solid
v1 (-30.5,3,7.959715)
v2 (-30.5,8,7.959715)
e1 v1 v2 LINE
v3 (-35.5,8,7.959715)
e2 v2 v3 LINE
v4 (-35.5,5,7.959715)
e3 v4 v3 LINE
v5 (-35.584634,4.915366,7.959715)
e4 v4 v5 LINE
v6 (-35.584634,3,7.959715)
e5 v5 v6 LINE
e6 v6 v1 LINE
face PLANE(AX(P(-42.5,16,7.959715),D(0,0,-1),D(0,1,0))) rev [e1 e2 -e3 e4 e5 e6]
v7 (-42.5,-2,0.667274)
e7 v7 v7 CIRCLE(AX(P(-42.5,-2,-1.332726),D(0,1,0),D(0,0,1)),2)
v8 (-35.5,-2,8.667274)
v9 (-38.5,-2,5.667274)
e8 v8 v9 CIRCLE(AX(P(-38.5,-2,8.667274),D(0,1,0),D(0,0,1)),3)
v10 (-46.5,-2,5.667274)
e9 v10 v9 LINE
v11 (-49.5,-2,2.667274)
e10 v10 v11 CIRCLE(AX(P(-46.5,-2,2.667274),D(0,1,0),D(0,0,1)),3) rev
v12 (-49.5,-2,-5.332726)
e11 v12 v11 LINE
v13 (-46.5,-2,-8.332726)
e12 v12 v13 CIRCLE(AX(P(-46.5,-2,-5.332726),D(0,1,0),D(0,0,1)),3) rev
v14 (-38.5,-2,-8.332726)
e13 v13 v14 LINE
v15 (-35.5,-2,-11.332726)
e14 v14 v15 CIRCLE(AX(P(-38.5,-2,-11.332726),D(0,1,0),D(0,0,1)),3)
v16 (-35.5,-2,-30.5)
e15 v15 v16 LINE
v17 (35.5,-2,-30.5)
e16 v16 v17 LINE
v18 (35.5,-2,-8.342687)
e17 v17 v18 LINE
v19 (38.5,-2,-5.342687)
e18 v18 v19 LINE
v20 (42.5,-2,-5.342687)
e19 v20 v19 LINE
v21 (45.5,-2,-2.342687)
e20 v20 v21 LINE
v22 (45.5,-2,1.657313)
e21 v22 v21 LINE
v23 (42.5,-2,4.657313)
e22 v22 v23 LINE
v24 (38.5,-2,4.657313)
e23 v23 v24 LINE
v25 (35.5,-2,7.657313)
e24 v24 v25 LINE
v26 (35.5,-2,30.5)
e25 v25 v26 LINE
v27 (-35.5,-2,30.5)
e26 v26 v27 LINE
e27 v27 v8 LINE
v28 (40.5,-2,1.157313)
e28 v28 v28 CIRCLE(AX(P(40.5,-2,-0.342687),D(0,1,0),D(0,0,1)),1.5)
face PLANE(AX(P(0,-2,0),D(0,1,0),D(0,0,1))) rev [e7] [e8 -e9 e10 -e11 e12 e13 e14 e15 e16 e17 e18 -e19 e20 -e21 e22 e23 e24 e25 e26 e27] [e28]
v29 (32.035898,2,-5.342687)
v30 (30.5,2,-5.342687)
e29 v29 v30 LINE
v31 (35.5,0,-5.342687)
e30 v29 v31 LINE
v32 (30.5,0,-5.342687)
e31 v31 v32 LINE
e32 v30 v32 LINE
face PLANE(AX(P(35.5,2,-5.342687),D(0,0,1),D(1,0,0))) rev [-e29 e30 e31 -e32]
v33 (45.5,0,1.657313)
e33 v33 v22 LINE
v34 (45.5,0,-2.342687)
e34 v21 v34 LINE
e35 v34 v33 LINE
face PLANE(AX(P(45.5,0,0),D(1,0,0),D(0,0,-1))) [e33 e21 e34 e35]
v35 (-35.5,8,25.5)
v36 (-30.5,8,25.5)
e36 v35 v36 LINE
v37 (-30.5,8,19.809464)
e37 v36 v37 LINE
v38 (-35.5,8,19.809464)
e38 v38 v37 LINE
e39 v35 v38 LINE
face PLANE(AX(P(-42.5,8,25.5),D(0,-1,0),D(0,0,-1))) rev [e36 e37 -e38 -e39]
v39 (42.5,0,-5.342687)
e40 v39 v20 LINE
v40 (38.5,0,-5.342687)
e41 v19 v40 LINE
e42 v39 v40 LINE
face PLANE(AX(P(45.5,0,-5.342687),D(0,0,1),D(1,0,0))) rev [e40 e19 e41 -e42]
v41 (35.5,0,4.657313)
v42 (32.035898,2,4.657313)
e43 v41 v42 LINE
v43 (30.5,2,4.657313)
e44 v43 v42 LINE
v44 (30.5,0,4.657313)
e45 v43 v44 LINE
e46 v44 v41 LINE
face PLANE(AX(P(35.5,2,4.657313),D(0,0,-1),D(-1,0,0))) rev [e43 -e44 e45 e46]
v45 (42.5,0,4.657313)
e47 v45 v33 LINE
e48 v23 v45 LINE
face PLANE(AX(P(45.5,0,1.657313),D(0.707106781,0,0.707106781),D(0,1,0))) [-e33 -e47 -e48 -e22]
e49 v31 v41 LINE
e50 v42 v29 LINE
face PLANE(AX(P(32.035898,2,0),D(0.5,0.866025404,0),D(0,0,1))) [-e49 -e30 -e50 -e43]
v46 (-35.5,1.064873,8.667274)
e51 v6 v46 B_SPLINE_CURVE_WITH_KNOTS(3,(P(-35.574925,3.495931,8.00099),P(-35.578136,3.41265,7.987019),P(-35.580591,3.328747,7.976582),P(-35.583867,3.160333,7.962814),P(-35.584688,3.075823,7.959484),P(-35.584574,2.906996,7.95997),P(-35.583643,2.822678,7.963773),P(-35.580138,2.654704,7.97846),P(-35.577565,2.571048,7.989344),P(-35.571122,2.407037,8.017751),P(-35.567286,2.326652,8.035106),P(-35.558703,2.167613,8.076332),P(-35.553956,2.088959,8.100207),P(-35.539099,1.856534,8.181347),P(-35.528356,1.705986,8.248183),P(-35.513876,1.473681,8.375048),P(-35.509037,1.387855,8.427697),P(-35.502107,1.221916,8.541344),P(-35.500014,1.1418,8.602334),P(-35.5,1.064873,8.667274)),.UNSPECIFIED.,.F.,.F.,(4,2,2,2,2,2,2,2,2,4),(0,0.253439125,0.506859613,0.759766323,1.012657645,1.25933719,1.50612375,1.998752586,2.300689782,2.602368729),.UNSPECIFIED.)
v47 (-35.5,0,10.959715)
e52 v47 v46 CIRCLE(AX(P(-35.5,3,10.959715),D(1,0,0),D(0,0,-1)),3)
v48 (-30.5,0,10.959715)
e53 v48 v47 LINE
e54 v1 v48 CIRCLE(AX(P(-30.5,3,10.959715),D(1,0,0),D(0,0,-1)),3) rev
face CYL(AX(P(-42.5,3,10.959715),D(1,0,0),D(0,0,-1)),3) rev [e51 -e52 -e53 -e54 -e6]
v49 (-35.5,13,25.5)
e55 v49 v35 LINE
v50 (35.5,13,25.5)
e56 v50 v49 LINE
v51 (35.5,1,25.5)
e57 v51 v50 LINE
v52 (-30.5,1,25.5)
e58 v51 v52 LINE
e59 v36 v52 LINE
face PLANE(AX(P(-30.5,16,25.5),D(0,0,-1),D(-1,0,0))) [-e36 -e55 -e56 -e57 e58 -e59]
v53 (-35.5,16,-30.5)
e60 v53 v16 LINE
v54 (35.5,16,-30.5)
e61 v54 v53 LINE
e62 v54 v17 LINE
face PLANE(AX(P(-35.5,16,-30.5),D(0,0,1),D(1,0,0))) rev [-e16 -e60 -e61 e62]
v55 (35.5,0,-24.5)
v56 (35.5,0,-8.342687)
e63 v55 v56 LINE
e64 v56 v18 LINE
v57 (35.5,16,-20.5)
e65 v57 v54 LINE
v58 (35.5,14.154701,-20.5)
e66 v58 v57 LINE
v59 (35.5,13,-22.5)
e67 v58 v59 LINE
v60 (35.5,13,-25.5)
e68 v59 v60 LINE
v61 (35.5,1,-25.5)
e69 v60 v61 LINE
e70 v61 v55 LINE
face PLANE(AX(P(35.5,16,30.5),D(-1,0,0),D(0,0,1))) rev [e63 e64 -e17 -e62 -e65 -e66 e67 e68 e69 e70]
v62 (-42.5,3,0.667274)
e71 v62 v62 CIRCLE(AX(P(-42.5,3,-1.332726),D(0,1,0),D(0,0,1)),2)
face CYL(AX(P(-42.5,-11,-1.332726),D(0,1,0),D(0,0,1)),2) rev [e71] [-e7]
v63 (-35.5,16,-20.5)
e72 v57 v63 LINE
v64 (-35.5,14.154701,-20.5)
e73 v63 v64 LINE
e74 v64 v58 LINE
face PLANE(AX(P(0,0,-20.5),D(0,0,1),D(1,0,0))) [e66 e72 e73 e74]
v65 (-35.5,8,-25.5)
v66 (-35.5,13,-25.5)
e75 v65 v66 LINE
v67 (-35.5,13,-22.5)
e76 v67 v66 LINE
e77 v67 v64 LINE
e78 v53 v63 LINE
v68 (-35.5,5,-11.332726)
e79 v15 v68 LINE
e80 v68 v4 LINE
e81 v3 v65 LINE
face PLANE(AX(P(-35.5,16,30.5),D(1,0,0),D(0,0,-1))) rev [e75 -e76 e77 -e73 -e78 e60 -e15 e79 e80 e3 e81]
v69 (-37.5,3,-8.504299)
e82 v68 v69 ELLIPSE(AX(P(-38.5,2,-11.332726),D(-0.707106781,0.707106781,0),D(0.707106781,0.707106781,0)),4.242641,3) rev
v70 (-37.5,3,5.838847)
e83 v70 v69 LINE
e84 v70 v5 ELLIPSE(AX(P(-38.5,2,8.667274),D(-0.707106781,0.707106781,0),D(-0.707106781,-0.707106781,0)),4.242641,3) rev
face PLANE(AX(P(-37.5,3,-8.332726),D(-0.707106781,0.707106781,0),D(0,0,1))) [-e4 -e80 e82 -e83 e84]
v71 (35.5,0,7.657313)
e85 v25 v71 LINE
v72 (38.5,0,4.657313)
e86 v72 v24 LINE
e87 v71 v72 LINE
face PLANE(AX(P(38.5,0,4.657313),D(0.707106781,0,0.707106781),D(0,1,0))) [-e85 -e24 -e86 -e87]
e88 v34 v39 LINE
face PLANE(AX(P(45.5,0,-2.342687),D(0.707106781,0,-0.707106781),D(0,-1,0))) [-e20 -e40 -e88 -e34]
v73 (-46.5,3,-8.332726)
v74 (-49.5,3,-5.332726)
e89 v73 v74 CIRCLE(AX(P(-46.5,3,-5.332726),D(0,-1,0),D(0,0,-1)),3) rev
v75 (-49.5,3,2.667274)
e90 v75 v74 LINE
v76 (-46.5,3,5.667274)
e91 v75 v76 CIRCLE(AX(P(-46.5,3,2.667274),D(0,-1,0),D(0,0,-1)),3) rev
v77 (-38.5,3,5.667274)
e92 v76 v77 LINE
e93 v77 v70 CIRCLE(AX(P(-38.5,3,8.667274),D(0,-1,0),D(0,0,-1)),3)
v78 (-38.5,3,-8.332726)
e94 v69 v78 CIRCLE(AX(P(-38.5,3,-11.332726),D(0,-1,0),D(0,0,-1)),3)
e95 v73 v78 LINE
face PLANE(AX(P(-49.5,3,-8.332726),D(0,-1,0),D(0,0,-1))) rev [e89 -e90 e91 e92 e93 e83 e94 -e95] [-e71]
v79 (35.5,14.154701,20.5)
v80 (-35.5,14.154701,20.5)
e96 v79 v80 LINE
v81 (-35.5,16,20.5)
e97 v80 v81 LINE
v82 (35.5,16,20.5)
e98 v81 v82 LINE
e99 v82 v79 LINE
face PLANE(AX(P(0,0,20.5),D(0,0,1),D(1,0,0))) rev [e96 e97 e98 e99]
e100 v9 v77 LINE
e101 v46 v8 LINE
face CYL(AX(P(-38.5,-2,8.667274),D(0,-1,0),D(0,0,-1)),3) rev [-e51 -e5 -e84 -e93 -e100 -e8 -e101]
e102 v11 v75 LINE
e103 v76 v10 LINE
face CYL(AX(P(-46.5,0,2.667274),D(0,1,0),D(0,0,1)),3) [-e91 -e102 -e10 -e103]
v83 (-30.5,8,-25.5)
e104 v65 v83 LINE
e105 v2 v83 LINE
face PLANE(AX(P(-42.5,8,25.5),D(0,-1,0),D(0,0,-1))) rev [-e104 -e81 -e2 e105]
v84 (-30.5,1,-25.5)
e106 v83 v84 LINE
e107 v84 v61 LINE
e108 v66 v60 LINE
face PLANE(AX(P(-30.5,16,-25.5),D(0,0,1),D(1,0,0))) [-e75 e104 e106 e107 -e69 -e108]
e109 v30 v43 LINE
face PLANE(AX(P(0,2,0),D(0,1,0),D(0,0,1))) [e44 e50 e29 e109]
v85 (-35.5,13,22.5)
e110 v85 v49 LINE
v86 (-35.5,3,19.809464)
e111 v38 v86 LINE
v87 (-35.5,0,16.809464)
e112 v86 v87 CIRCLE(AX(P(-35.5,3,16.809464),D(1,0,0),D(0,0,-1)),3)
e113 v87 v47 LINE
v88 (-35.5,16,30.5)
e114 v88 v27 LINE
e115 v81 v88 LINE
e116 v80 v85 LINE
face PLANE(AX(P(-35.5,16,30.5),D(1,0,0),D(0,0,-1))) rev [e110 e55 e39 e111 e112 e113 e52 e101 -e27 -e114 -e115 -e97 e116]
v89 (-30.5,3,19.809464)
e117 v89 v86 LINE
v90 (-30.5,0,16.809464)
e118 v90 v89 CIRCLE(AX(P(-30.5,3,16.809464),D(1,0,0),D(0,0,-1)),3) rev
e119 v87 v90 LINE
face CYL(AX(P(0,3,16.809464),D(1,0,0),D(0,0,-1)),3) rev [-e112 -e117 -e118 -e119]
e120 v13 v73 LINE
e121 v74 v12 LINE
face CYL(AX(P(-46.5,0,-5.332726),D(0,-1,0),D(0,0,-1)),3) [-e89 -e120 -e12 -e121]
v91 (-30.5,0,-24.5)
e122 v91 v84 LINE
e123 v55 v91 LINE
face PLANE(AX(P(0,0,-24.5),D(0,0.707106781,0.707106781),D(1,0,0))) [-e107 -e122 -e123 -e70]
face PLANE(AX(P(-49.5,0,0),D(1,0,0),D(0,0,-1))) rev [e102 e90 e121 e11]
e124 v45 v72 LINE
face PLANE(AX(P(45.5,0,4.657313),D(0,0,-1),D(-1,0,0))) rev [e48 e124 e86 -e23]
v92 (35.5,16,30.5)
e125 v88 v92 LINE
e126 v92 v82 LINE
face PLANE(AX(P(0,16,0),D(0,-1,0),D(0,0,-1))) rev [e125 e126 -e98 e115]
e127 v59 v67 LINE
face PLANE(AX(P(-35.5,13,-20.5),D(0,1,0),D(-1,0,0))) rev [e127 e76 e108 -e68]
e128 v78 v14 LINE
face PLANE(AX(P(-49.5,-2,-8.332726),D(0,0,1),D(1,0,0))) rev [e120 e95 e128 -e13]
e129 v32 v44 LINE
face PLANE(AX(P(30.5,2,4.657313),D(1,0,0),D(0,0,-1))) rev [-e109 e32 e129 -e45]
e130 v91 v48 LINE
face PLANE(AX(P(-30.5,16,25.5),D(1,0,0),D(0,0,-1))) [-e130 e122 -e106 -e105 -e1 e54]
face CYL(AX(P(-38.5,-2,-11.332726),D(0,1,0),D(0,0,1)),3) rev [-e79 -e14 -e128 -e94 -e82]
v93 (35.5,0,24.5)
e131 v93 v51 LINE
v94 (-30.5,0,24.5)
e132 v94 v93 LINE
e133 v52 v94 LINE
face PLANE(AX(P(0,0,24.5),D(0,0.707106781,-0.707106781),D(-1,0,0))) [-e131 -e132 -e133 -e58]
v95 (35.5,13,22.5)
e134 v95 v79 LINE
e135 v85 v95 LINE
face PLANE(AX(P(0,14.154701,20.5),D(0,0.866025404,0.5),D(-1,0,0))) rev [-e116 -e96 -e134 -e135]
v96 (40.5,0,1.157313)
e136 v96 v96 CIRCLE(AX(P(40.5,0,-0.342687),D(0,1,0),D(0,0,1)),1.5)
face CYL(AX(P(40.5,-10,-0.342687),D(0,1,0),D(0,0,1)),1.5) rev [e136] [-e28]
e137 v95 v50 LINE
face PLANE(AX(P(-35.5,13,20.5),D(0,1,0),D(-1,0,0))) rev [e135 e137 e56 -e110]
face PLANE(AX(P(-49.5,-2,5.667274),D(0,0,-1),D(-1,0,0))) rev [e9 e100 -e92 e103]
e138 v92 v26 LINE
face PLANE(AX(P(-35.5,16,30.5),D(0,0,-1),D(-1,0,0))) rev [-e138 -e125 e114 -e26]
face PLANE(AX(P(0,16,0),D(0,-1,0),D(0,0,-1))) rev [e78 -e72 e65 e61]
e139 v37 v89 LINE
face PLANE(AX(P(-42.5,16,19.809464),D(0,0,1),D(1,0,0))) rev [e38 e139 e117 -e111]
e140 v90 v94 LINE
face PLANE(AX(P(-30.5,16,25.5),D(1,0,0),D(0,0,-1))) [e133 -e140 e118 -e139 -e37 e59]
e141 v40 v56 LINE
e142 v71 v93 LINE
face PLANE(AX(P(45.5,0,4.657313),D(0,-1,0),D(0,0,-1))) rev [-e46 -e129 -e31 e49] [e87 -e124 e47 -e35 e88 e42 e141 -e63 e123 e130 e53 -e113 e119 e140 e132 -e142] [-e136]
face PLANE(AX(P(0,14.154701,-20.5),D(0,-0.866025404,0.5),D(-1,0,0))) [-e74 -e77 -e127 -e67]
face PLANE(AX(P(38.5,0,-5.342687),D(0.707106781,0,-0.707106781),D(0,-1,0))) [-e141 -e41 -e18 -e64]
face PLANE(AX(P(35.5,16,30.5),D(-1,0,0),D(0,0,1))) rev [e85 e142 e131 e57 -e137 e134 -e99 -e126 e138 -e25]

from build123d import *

# Parameters (mm, degrees)
SKETCH1_W           = 71
SKETCH1_H           = 61
SKETCH1_W_2         = 61
SKETCH1_H_2         = 51
BOSS_EXTRUDE1_DEPTH = 16
SKETCH2_W           = 71
SKETCH2_H           = 61
BOSS_EXTRUDE2_DEPTH = 2
SKETCH3_W           = 11.849749017
SKETCH3_H           = 16
CUT_EXTRUDE1_DEPTH  = 12
FILLET1_R           = 3
SKETCH4_W           = 15
SKETCH4_H           = 16
CUT_EXTRUDE2_DEPTH  = 12
SKETCH5_W           = 21
SKETCH5_H           = 8
CUT_EXTRUDE3_DEPTH  = 12
SKETCH6_W           = 51
SKETCH6_H           = 8
CUT_EXTRUDE4_DEPTH  = 12
CHAMFER1_SIZE       = 1
SKETCH8_W           = 21
SKETCH8_H           = 8
CUT_EXTRUDE5_DEPTH  = 14
SKETCH9_W           = 71
SKETCH9_H           = 3
BOSS_EXTRUDE4_DEPTH = 5
CHAMFER3_SIZE       = 2
CHAMFER3_SIZE2      = 1.154700538
SKETCH10_W          = 71
SKETCH10_H          = 3
BOSS_EXTRUDE5_DEPTH = 5
CHAMFER4_SIZE       = 2
CHAMFER4_SIZE2      = 1.154700538
SKETCH11_W          = 5
SKETCH11_H          = 10
BOSS_EXTRUDE6_DEPTH = 2
CHAMFER5_SIZE       = 2
CHAMFER5_SIZE2      = 3.464101615
SKETCH12_W          = 14
SKETCH12_H          = 5
BOSS_EXTRUDE7_DEPTH = 14
CHAMFER6_SIZE       = 2
SKETCH13_R          = 2
CUT_EXTRUDE6_DEPTH  = 14
FILLET2_R           = 3
SKETCH14_W          = 10
SKETCH14_H          = 2
BOSS_EXTRUDE8_DEPTH = 10
SKETCH15_R          = 1.5
CUT_EXTRUDE7_DEPTH  = 10
CHAMFER7_SIZE       = 3
CHAMFER8_SIZE       = 3
FILLET3_R           = 3


with BuildPart() as part:
    # Sketch1 → Boss-Extrude1 (new body)
    with BuildSketch(Plane(origin=(0, 0, 0), x_dir=(1, 0, 0), z_dir=(0, 1, 0))):
        Rectangle(SKETCH1_W, SKETCH1_H)
        Rectangle(SKETCH1_W_2, SKETCH1_H_2, mode=Mode.SUBTRACT)
    extrude(amount=BOSS_EXTRUDE1_DEPTH)

    # Sketch2 → Boss-Extrude2 (add)
    with BuildSketch(Plane.XZ):
        Rectangle(SKETCH2_W, SKETCH2_H)
    extrude(amount=BOSS_EXTRUDE2_DEPTH)

    # Sketch3 → Cut-Extrude1 (cut)
    with BuildSketch(Plane(origin=(-30.5, 0, 0), x_dir=(0, 0, -1), z_dir=(1, 0, 0))):
        with Locations((-13.884589143, 8)):
            Rectangle(SKETCH3_W, SKETCH3_H)
    extrude(amount=-CUT_EXTRUDE1_DEPTH, mode=Mode.SUBTRACT)

    # Fillet1
    fillet1_edges = [part.edges().sort_by_distance(p)[0] for p in [
        (-33, 0, 19.809463651),
        (-33, 0, 7.959714634),
    ]]
    fillet(fillet1_edges, radius=FILLET1_R)

    # Sketch4 → Cut-Extrude2 (cut)
    with BuildSketch(Plane.ZY.offset(-30.5)):
        with Locations((-18, 8)):
            Rectangle(SKETCH4_W, SKETCH4_H)
        with Locations((18, 8)):
            Rectangle(SKETCH4_W, SKETCH4_H)
    extrude(amount=-CUT_EXTRUDE2_DEPTH, mode=Mode.SUBTRACT)

    # Sketch5 → Cut-Extrude3 (cut)
    with BuildSketch(Plane.ZY.offset(-30.5)):
        with Locations((0, 12)):
            Rectangle(SKETCH5_W, SKETCH5_H)
    extrude(amount=-CUT_EXTRUDE3_DEPTH, mode=Mode.SUBTRACT)

    # Sketch6 → Cut-Extrude4 (cut)
    with BuildSketch(Plane(origin=(-30.5, 0, 0), x_dir=(0, 0, -1), z_dir=(1, 0, 0))):
        with Locations((0, 12)):
            Rectangle(SKETCH6_W, SKETCH6_H)
    extrude(amount=-CUT_EXTRUDE4_DEPTH, mode=Mode.SUBTRACT)

    # Chamfer1
    chamfer1_edges = [part.edges().sort_by_distance(p)[0] for p in [
        (2.5, 0, -25.5),
        (2.5, 0, 25.5),
    ]]
    chamfer(chamfer1_edges, length=CHAMFER1_SIZE)

    # Sketch8 → Cut-Extrude5 (cut)
    with BuildSketch(Plane.ZY.offset(-30.5)):
        with Locations((0, 4)):
            Rectangle(SKETCH8_W, SKETCH8_H)
    extrude(amount=-CUT_EXTRUDE5_DEPTH, mode=Mode.SUBTRACT)

    # Sketch9 → Boss-Extrude4 (add)
    with BuildSketch(Plane.XY.offset(-25.5)):
        with Locations((0, 14.5)):
            Rectangle(SKETCH9_W, SKETCH9_H)
    extrude(amount=BOSS_EXTRUDE4_DEPTH)

    # Chamfer3
    chamfer3_edges = [part.edges().sort_by_distance(p)[0] for p in [
        (0, 13, -20.5),
    ]]
    chamfer3_side = [part.faces().sort_by_distance(p)[0] for p in [
        (0, 13, -23),
    ]]
    chamfer(chamfer3_edges, length=CHAMFER3_SIZE, length2=CHAMFER3_SIZE2, reference=chamfer3_side[0])

    # Sketch10 → Boss-Extrude5 (add)
    with BuildSketch(Plane(origin=(0, 0, 25.5), x_dir=(-1, 0, 0), z_dir=(0, 0, -1))):
        with Locations((0, 14.5)):
            Rectangle(SKETCH10_W, SKETCH10_H)
    extrude(amount=BOSS_EXTRUDE5_DEPTH)

    # Chamfer4
    chamfer4_edges = [part.edges().sort_by_distance(p)[0] for p in [
        (0, 13, 20.5),
    ]]
    chamfer4_side = [part.faces().sort_by_distance(p)[0] for p in [
        (0, 13, 23),
    ]]
    chamfer(chamfer4_edges, length=CHAMFER4_SIZE, length2=CHAMFER4_SIZE2, reference=chamfer4_side[0])

    # Sketch11 → Boss-Extrude6 (add)
    with BuildSketch(Plane(origin=(0, 0, 0), x_dir=(1, 0, 0), z_dir=(0, 1, 0))):
        with Locations((33, 0.342687242)):
            Rectangle(SKETCH11_W, SKETCH11_H)
    extrude(amount=BOSS_EXTRUDE6_DEPTH)

    # Chamfer5
    chamfer5_edges = [part.edges().sort_by_distance(p)[0] for p in [
        (35.5, 2, -0.342687242),
    ]]
    chamfer5_side = [part.faces().sort_by_distance(p)[0] for p in [
        (35.5, 15.077350269, 21.136003145),
    ]]
    chamfer(chamfer5_edges, length=CHAMFER5_SIZE, length2=CHAMFER5_SIZE2, reference=chamfer5_side[0])

    # Sketch12 → Boss-Extrude7 (add)
    with BuildSketch(Plane.ZY.offset(35.5)):
        with Locations((-1.332725664, 0.5)):
            Rectangle(SKETCH12_W, SKETCH12_H)
    extrude(amount=BOSS_EXTRUDE7_DEPTH)

    # Chamfer6
    chamfer6_edges = [part.edges().sort_by_distance(p)[0] for p in [
        (-35.5, 3, -1.332725664),
    ]]
    chamfer(chamfer6_edges, length=CHAMFER6_SIZE)

    # Sketch13 → Cut-Extrude6 (cut)
    with BuildSketch(Plane(origin=(0, 3, 0), x_dir=(1, 0, 0), z_dir=(0, 1, 0))):
        with Locations(Location((-42.5, 1.332725664, 0), (0, 0, 270))):
            Circle(SKETCH13_R)
    extrude(amount=-CUT_EXTRUDE6_DEPTH, mode=Mode.SUBTRACT)

    # Fillet2
    fillet2_edges = [part.edges().sort_by_distance(p)[0] for p in [
        (-49.5, 0.5, -8.332725664),
        (-49.5, 0.5, 5.667274336),
    ]]
    fillet(fillet2_edges, radius=FILLET2_R)

    # Sketch14 → Boss-Extrude8 (add)
    with BuildSketch(Plane(origin=(35.5, 0, 0), x_dir=(0, 0, -1), z_dir=(1, 0, 0))):
        with Locations((0.342687242, -1)):
            Rectangle(SKETCH14_W, SKETCH14_H)
    extrude(amount=BOSS_EXTRUDE8_DEPTH)

    # Sketch15 → Cut-Extrude7 (cut)
    with BuildSketch(Plane(origin=(0, 0, 0), x_dir=(1, 0, 0), z_dir=(0, 1, 0))):
        with Locations(Location((40.5, 0.342687242, 0), (0, 0, 270))):
            Circle(SKETCH15_R)
    extrude(amount=-CUT_EXTRUDE7_DEPTH, mode=Mode.SUBTRACT)

    # Chamfer7
    chamfer7_edges = [part.edges().sort_by_distance(p)[0] for p in [
        (45.5, -1, 4.657312758),
        (45.5, -1, -5.342687242),
    ]]
    chamfer(chamfer7_edges, length=CHAMFER7_SIZE)

    # Chamfer8
    # the kernel refuses this chamfer: 3 mm, written as the material it adds along each edge
    with BuildSketch(Plane(origin=(35.5, -2, 4.657312758), x_dir=(0.9996219169112968, 0, -0.02749587661058648), z_dir=(0, 1, 0)), Plane(origin=(35.5, 0, -5.342687242), x_dir=(0.9996219169112968, 0, 0.02749587661058648), z_dir=(0, -1, 0))) as chamfer8_piece_1:
        Polygon((CHAMFER8_SIZE * 0.999621916911, -CHAMFER8_SIZE * 0.0274958766106), (-CHAMFER8_SIZE * 0.0274958766106, -CHAMFER8_SIZE * 0.999621916911), (0, 0), align=None)
    extrude(amount=2)

    # Fillet3
    # the kernel refuses this fillet: 3 mm, written as the material it adds along each edge
    with BuildSketch(Plane(origin=(-35.5, 12.5, 5.667274336), x_dir=(0, 0, 1), z_dir=(0, -1, 0))) as fillet3_piece_1_section:
        with BuildLine():
            CenterArc((FILLET3_R, FILLET3_R), FILLET3_R, 180, 90)
            Line((0, FILLET3_R), (0, 0))
            Line((0, 0), (FILLET3_R, 0))
        make_face()
    fillet3_piece_1 = extrude(amount=14.5, mode=Mode.PRIVATE)
    fillet3_piece_1 = split(fillet3_piece_1, bisect_by=Plane(origin=(-37.935900015, 2.564099985, 5.657679593), z_dir=(-0.7071067811865477, 0.7071067811865475, 0)), keep=Keep.TOP, mode=Mode.PRIVATE)
    fillet3_piece_1 = split(fillet3_piece_1, bisect_by=Plane(origin=(-38.08120002, 3, 5.657679593), z_dir=(0, -1, 0)), keep=Keep.TOP, mode=Mode.PRIVATE)
    add(fillet3_piece_1)
    with BuildSketch(Plane(origin=(-35.5, 12.5, 5.667274336), x_dir=(0, 0, 1), z_dir=(0, -1, 0))) as fillet3_piece_2_section:
        with BuildLine():
            CenterArc((FILLET3_R, FILLET3_R), FILLET3_R, 180, 90)
            Line((0, FILLET3_R), (0, 0))
            Line((0, 0), (FILLET3_R, 0))
        make_face()
    fillet3_piece_2 = extrude(amount=14.5, mode=Mode.PRIVATE)
    fillet3_piece_2 = split(fillet3_piece_2, bisect_by=Plane(origin=(-36.308682262, 4.191317738, 6.44717053), z_dir=(0.7071067811865477, -0.7071067811865475, 0)), keep=Keep.TOP, mode=Mode.PRIVATE)
    fillet3_piece_2 = split(fillet3_piece_2, bisect_by=Plane(origin=(-35.911576349, 3.794211825, 7.959714634), z_dir=(0, 0, -1)), keep=Keep.TOP, mode=Mode.PRIVATE)
    fillet3_piece_2 = split(fillet3_piece_2, bisect_by=Plane(origin=(-35.911576349, 3, 6.44717053), z_dir=(0, 1, 0)), keep=Keep.TOP, mode=Mode.PRIVATE)
    add(fillet3_piece_2)
    with BuildSketch(Plane(origin=(-35.5, 12.5, 5.667274336), x_dir=(0, 0, 1), z_dir=(0, -1, 0))) as fillet3_piece_3_section:
        with BuildLine():
            CenterArc((FILLET3_R, FILLET3_R), FILLET3_R, 180, 90)
            Line((0, FILLET3_R), (0, 0))
            Line((0, 0), (FILLET3_R, 0))
        make_face()
    fillet3_piece_3 = extrude(amount=14.5, mode=Mode.PRIVATE)
    fillet3_piece_3 = split(fillet3_piece_3, bisect_by=Plane(origin=(-38.099888212, 2.400111788, 6.295666552), z_dir=(0.7071067811865477, -0.7071067811865475, 0)), keep=Keep.TOP, mode=Mode.PRIVATE)
    fillet3_piece_3 = split(fillet3_piece_3, bisect_by=Plane(origin=(-36.191024286, 0.491247862, 7.959714634), z_dir=(0, 0, -1)), keep=Keep.TOP, mode=Mode.PRIVATE)
    fillet3_piece_3 = split(fillet3_piece_3, bisect_by=Plane(origin=(-36.191024286, 3, 6.295666552), z_dir=(0, -1, 0)), keep=Keep.TOP, mode=Mode.PRIVATE)
    add(fillet3_piece_3)
    with BuildSketch(Plane(origin=(-35.5, 12.5, 5.667274336), x_dir=(0, 0, 1), z_dir=(0, -1, 0))) as fillet3_piece_4_section:
        with BuildLine():
            CenterArc((FILLET3_R, FILLET3_R), FILLET3_R, 180, 90)
            Line((0, FILLET3_R), (0, 0))
            Line((0, 0), (FILLET3_R, 0))
        make_face()
    fillet3_piece_4 = extrude(amount=14.5, mode=Mode.PRIVATE)
    fillet3_piece_4 = split(fillet3_piece_4, bisect_by=Plane(origin=(-35.48926289, -0.06844391, 7.959714634), z_dir=(0, 0, 1)), keep=Keep.TOP, mode=Mode.PRIVATE)
    fillet3_piece_4 = fillet3_piece_4 - Plane(origin=(-35.48926289, 3, 10.959714634), x_dir=(0, -1, 0), z_dir=(-1, 0, 0)) * Cylinder(3, 41, mode=Mode.PRIVATE)
    fillet3_piece_4 = split(fillet3_piece_4, bisect_by=Plane(origin=(-35.48926289, 3, 8.232443119), z_dir=(0, -1, 0)), keep=Keep.TOP, mode=Mode.PRIVATE)
    add(fillet3_piece_4)
    with BuildSketch(Plane(origin=(-35.5, -2, -8.332725664), x_dir=(0, 0, -1), z_dir=(0, 1, 0))) as fillet3_piece_5_section:
        with BuildLine():
            CenterArc((FILLET3_R, FILLET3_R), FILLET3_R, 180, 90)
            Line((0, FILLET3_R), (0, 0))
            Line((0, 0), (FILLET3_R, 0))
        make_face()
    fillet3_piece_5 = extrude(amount=14.5, mode=Mode.PRIVATE)
    fillet3_piece_5 = split(fillet3_piece_5, bisect_by=Plane(origin=(-38.090184906, 2.409815094, -9.014565132), z_dir=(0.7071067811865477, -0.7071067811865475, 0)), keep=Keep.TOP, mode=Mode.PRIVATE)
    fillet3_piece_5 = split(fillet3_piece_5, bisect_by=Plane(origin=(-36.171856175, 3, -9.014565132), z_dir=(0, -1, 0)), keep=Keep.TOP, mode=Mode.PRIVATE)
    add(fillet3_piece_5)
    with BuildSketch(Plane(origin=(-35.5, -2, -8.332725664), x_dir=(0, 0, -1), z_dir=(0, 1, 0))) as fillet3_piece_6_section:
        with BuildLine():
            CenterArc((FILLET3_R, FILLET3_R), FILLET3_R, 180, 90)
            Line((0, FILLET3_R), (0, 0))
            Line((0, 0), (FILLET3_R, 0))
        make_face()
    fillet3_piece_6 = extrude(amount=14.5, mode=Mode.PRIVATE)
    fillet3_piece_6 = split(fillet3_piece_6, bisect_by=Plane(origin=(-37.935900015, 2.564099985, -8.32313092), z_dir=(-0.7071067811865477, 0.7071067811865475, 0)), keep=Keep.TOP, mode=Mode.PRIVATE)
    fillet3_piece_6 = split(fillet3_piece_6, bisect_by=Plane(origin=(-38.08120002, 3, -8.32313092), z_dir=(0, -1, 0)), keep=Keep.TOP, mode=Mode.PRIVATE)
    add(fillet3_piece_6)
    with BuildSketch(Plane(origin=(-35.5, -2, -8.332725664), x_dir=(0, 0, -1), z_dir=(0, 1, 0))) as fillet3_piece_7_section:
        with BuildLine():
            CenterArc((FILLET3_R, FILLET3_R), FILLET3_R, 180, 90)
            Line((0, FILLET3_R), (0, 0))
            Line((0, 0), (FILLET3_R, 0))
        make_face()
    fillet3_piece_7 = extrude(amount=14.5, mode=Mode.PRIVATE)
    fillet3_piece_7 = split(fillet3_piece_7, bisect_by=Plane(origin=(-36.295704825, 4.204295175, -9.186455327), z_dir=(0.7071067811865477, -0.7071067811865475, 0)), keep=Keep.TOP, mode=Mode.PRIVATE)
    fillet3_piece_7 = split(fillet3_piece_7, bisect_by=Plane(origin=(-35.8942731, 3, -9.186455327), z_dir=(0, 1, 0)), keep=Keep.TOP, mode=Mode.PRIVATE)
    add(fillet3_piece_7)


solid = part.part
